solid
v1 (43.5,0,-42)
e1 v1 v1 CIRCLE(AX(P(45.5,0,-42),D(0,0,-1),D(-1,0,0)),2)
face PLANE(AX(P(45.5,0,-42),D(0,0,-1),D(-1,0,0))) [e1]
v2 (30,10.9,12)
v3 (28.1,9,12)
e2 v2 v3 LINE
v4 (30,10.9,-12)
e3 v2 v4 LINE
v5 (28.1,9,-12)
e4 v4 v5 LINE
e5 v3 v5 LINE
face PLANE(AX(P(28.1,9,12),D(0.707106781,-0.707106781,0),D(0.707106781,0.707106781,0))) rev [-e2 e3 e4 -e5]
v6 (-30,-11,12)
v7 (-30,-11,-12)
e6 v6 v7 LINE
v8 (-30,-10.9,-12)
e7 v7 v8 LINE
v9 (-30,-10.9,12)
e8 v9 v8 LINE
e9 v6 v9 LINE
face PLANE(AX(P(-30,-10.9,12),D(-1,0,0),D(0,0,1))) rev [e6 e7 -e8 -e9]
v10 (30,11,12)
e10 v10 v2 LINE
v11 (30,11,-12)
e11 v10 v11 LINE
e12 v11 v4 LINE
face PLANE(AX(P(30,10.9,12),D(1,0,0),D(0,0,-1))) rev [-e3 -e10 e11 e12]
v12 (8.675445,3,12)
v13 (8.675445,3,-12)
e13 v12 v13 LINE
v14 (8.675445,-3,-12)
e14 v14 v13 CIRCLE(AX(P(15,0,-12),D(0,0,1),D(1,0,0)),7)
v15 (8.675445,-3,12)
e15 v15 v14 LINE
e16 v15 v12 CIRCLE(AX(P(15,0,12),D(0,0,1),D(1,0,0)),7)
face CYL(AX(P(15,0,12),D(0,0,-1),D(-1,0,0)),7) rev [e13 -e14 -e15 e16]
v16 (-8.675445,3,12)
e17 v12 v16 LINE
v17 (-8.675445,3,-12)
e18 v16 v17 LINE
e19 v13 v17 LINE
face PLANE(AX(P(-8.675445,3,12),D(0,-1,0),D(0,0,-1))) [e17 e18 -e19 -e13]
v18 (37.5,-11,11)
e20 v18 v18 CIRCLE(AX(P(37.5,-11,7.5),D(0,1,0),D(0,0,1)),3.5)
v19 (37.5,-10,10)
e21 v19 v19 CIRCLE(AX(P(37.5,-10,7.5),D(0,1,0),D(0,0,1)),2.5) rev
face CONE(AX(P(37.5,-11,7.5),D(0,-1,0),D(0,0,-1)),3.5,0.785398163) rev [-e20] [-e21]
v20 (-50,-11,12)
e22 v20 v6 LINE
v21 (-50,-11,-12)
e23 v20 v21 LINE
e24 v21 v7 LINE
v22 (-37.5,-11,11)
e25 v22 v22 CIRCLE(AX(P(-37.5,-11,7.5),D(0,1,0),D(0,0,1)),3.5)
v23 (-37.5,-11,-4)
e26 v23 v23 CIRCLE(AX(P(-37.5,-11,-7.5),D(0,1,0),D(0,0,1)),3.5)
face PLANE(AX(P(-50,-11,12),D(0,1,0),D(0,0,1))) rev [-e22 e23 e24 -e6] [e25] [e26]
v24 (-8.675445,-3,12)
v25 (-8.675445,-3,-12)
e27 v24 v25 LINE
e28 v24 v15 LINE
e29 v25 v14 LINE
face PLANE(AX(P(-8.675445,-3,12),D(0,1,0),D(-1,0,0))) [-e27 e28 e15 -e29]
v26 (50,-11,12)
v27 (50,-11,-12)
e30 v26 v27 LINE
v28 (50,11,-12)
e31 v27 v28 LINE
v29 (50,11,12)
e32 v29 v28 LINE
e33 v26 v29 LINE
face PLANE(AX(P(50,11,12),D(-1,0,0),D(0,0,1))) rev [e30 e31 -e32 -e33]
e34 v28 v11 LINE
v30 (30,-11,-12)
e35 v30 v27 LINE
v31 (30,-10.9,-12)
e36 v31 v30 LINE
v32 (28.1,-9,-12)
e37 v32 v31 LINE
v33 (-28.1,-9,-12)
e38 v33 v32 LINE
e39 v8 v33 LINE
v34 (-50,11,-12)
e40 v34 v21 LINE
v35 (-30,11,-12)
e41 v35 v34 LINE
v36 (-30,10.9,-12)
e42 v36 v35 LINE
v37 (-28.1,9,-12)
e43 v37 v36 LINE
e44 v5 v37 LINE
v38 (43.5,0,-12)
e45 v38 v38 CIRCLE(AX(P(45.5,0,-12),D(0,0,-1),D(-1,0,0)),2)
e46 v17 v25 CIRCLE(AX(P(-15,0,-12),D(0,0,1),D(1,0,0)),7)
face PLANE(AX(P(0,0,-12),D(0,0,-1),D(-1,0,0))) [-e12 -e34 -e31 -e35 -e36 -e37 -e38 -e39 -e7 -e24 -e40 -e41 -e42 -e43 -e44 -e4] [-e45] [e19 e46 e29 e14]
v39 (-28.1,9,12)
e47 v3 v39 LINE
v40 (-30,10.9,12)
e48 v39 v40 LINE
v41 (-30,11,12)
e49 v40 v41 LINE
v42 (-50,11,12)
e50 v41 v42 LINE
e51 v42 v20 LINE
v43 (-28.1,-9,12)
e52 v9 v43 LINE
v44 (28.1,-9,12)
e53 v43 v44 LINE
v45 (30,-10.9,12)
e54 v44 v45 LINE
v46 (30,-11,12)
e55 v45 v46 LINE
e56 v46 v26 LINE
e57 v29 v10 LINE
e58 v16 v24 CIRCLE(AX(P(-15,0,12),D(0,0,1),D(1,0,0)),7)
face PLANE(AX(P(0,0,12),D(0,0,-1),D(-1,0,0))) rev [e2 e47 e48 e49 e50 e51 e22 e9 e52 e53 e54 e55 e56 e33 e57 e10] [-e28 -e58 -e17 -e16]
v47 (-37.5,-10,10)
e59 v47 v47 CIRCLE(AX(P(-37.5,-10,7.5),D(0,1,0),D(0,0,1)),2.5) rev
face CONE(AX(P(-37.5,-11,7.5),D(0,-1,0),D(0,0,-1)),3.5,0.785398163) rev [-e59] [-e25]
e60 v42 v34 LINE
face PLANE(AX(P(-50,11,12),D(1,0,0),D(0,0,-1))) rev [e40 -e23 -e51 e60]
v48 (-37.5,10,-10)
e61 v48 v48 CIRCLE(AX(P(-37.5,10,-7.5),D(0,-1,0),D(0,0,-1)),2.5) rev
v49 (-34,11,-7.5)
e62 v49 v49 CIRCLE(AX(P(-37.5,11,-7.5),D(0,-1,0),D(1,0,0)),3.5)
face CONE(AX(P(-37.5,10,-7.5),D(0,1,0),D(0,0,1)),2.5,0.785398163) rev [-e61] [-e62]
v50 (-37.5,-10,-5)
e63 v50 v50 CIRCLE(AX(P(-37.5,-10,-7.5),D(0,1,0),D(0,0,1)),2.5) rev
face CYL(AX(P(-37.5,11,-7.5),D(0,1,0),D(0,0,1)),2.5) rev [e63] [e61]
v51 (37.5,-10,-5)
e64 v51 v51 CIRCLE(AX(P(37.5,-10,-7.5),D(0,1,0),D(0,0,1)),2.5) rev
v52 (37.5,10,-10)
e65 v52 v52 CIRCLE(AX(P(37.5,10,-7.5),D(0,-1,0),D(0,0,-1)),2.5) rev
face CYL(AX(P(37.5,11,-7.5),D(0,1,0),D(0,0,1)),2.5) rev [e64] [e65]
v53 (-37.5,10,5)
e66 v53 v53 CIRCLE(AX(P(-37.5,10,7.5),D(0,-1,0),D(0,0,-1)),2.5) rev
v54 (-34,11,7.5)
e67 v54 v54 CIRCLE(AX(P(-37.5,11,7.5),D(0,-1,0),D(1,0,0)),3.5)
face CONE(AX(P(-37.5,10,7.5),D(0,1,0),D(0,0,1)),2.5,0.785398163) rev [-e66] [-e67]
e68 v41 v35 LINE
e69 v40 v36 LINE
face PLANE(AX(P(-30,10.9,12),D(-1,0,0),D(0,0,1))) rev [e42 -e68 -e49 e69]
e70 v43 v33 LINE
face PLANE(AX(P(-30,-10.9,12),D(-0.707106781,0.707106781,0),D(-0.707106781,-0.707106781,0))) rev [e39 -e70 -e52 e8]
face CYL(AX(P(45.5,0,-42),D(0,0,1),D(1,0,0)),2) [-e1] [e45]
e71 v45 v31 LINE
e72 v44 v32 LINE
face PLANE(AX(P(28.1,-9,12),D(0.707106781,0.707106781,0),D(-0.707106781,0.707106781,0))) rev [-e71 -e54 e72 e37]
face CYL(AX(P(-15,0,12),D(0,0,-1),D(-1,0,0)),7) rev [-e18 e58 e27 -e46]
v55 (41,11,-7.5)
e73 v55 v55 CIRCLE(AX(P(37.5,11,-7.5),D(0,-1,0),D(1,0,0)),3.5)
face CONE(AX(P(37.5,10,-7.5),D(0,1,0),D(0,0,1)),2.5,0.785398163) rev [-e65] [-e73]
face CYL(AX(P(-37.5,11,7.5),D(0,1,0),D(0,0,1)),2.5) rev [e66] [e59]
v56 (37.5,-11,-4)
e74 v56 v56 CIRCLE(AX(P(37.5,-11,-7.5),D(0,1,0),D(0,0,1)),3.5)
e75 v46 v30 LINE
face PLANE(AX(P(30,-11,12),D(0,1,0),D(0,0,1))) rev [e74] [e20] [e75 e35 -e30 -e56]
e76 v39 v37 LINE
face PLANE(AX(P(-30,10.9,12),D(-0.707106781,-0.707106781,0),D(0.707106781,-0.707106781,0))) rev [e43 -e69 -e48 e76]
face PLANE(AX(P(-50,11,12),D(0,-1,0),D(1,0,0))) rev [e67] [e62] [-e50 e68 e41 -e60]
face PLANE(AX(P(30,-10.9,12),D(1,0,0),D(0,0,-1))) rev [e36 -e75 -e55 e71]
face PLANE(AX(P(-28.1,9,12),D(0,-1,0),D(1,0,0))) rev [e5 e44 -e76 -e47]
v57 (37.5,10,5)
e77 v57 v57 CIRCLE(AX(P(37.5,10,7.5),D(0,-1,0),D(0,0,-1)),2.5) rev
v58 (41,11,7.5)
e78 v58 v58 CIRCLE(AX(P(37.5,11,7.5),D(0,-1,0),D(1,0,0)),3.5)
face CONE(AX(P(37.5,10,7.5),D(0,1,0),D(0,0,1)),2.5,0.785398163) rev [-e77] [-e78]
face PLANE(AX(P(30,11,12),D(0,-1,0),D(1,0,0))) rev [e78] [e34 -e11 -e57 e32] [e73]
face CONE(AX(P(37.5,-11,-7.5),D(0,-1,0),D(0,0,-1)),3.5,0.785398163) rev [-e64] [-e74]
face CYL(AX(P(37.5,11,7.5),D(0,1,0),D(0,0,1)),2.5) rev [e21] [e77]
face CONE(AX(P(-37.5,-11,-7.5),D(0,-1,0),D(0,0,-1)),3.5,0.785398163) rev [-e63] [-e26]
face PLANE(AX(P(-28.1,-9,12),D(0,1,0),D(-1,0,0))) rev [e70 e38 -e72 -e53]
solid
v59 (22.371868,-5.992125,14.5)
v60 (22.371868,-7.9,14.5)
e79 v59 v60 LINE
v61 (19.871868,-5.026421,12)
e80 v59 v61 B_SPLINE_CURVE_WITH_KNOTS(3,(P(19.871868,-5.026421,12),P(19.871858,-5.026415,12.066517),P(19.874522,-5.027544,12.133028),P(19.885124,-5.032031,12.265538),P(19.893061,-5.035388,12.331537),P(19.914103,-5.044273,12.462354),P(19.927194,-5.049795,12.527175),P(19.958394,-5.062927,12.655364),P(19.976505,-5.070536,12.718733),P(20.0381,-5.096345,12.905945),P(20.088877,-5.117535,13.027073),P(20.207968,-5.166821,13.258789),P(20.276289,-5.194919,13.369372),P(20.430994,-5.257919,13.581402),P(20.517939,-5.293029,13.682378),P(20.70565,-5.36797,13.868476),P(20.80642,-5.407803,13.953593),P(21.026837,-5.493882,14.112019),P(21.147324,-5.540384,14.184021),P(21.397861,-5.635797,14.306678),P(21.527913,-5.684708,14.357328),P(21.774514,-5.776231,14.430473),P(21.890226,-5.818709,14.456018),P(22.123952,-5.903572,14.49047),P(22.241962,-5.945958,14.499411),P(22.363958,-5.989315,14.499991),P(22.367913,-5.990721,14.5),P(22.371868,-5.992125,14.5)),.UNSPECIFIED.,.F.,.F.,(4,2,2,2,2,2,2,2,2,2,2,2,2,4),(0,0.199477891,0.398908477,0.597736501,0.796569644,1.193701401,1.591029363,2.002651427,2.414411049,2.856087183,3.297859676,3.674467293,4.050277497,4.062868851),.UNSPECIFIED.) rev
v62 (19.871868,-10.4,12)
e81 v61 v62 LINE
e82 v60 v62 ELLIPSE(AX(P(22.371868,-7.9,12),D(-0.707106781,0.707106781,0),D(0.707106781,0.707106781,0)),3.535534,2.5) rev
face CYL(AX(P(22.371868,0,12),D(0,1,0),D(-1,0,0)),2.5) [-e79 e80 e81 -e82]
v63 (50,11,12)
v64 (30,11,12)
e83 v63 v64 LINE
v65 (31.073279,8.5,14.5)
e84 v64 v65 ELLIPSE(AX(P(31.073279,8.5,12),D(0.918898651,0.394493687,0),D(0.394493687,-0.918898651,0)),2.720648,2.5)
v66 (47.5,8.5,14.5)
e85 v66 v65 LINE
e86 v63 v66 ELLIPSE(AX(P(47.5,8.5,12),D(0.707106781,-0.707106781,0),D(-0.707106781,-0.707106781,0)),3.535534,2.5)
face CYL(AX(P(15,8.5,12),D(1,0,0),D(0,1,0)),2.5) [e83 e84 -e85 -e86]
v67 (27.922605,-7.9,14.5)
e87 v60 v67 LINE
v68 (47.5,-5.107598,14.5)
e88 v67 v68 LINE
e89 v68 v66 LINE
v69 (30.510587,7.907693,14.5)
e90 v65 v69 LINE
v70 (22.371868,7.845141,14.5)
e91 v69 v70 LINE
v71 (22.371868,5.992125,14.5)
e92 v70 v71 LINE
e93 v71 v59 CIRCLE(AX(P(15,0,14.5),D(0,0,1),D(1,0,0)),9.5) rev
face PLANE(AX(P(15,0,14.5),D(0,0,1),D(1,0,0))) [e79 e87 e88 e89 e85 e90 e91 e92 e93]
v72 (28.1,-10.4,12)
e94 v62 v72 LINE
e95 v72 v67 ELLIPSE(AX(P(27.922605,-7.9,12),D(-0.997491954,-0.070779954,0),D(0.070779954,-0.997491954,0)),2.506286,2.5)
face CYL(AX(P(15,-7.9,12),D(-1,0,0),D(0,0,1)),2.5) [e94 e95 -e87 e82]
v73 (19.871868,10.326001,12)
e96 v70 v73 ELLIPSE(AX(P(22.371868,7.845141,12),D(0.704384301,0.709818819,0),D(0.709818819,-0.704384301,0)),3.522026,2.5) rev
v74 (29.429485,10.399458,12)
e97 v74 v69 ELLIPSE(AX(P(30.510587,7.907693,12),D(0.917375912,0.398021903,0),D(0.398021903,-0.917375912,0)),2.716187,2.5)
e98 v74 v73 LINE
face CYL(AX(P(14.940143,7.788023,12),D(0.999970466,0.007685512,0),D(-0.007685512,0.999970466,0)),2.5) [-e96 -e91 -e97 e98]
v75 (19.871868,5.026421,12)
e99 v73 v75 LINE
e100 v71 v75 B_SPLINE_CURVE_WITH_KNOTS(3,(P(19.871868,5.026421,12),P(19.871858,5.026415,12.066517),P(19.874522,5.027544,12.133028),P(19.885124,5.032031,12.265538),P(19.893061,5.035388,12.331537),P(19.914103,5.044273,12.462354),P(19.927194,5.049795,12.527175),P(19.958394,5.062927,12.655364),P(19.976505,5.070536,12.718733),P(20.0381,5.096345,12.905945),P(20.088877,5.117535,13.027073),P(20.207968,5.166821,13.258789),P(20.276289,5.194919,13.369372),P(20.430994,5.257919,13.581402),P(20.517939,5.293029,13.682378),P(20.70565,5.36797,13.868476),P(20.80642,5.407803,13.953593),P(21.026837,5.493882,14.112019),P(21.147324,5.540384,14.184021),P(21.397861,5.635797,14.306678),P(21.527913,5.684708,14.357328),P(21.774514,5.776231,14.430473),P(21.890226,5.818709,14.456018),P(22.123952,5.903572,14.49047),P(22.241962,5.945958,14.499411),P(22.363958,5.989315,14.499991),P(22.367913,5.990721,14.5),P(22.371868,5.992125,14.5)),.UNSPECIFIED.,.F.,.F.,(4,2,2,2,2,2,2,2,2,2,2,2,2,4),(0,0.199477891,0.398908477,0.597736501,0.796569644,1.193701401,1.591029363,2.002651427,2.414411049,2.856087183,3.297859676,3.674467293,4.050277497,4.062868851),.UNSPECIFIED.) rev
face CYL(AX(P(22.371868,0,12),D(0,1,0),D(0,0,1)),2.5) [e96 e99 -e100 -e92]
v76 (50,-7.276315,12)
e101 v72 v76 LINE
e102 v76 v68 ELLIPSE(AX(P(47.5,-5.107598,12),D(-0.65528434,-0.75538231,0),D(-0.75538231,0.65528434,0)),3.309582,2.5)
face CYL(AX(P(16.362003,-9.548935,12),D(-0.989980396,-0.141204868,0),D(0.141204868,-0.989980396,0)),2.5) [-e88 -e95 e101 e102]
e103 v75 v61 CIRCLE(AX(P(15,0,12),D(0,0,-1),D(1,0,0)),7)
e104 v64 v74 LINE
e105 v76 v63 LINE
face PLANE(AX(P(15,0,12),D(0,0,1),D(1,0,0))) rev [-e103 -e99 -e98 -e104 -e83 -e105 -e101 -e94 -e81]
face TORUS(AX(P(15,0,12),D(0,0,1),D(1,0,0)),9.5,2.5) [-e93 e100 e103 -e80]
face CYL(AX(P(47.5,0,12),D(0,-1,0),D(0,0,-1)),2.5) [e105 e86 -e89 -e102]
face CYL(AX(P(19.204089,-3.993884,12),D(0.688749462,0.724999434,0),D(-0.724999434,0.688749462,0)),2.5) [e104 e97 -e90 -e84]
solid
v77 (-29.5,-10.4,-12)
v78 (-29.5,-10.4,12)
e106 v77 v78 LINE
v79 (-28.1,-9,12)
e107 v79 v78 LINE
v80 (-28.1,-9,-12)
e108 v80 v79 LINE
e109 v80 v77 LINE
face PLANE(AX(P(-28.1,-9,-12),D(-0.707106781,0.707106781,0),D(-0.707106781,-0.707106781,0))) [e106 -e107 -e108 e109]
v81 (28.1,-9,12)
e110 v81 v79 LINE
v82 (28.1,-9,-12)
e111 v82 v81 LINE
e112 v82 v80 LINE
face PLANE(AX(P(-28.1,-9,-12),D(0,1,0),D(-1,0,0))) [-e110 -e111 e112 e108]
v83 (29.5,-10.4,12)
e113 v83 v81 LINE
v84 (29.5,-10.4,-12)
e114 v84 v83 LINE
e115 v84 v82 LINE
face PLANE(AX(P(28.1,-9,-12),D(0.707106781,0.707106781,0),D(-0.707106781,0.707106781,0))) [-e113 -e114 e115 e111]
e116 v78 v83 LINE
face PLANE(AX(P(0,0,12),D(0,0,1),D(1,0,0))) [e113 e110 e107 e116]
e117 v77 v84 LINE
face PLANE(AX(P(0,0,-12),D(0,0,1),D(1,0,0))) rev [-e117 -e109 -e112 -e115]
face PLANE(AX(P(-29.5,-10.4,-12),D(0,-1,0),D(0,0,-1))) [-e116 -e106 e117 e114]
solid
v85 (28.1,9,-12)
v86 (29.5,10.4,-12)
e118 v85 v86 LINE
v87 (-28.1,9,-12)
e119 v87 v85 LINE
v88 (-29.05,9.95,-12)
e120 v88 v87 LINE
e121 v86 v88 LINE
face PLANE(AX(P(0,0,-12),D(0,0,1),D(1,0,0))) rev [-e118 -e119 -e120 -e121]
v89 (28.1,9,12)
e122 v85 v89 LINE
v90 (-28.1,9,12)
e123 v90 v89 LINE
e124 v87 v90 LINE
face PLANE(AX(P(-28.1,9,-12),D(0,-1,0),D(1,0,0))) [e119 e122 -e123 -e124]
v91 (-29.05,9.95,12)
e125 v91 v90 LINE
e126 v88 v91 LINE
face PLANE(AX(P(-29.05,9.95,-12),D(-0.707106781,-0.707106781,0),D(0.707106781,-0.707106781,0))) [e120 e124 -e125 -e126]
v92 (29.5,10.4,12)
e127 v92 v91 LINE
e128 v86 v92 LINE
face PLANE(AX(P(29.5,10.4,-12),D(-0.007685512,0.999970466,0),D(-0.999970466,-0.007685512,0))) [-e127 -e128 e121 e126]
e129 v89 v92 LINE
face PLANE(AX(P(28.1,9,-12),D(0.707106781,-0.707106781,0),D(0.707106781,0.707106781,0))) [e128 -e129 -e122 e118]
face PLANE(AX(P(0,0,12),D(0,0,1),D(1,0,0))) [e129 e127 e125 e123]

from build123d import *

# Parameters (mm, degrees)
EXTRUDE_1_DEPTH    = 12
HOLE_WIZARD_M6_1_D = 5
CHAMFER_1_SIZE     = 1
EXTRUDE_2_DEPTH    = 24
EXTRUDE_2_2_DEPTH  = 24
EXTRUDE_3_DEPTH    = 2.5
FILLET_1_R         = 2.5
SKETCH_6_R         = 2
EXTRUDE_4_DEPTH    = 30


with BuildPart() as part:
    # 草图1 → 凸台-拉伸1 (new, symmetric)
    with BuildSketch(Plane.XY):
        Polygon((-30, 10.9), (-30, 11), (-50, 11), (-50, -11), (-30, -11), (-30, -10.9), (-28.1, -9), (28.1, -9), (30, -10.9), (30, -11), (50, -11), (50, 11), (30, 11), (30, 10.9), (28.1, 9), (-28.1, 9), align=None)
        with BuildLine():
            Line((-8.67544468, 3), (8.67544468, 3))
            ThreePointArc((8.67544468, 3), (22, 0), (8.67544468, -3))
            Line((8.67544468, -3), (-8.67544468, -3))
            ThreePointArc((-8.67544468, -3), (-22, 0), (-8.67544468, 3))
        make_face(mode=Mode.SUBTRACT)
    extrude(amount=EXTRUDE_1_DEPTH, both=True)

    # M6 螺纹孔1 (through all)
    with Locations(Plane(origin=(-37.5, 11, -7.5), x_dir=(1, 0, 0), z_dir=(0, 1, 0))):
        with Locations((0, 0), (0, -15), (75, 0), (75, -15)):
            Hole(HOLE_WIZARD_M6_1_D / 2)

    # 倒角1
    chamfer_1_edges = [part.edges().sort_by_distance(p)[0] for p in [
        (40, 11, 7.5),
        (40, -11, 7.5),
        (40, 11, -7.5),
        (40, -11, -7.5),
        (-35, 11, 7.5),
        (-35, -11, 7.5),
        (-35, 11, -7.5),
        (-35, -11, -7.5),
    ]]
    chamfer(chamfer_1_edges, length=CHAMFER_1_SIZE)

    # 草图6 → 凸台-拉伸4 (add)
    with BuildSketch(Plane(origin=(0, 0, -12), x_dir=(-1, 0, 0), z_dir=(0, 0, -1))):
        with Locations((-45.5, 0)):
            Circle(SKETCH_6_R)
    extrude(amount=EXTRUDE_4_DEPTH)


with BuildPart() as body_2:
    # 草图4 → 凸台-拉伸2 (new body)
    with BuildSketch(Plane.XY.offset(12)):
        Polygon((28.1, 9), (29.5, 10.4), (-29.05, 9.95), (-28.1, 9), align=None)
    extrude(amount=-EXTRUDE_2_DEPTH)


with BuildPart() as body_3:
    # 草图4 → Extrude 2 2 (new body)
    with BuildSketch(Plane.XY.offset(12)):
        Polygon((-29.5, -10.4), (29.5, -10.4), (28.1, -9), (-28.1, -9), align=None)
    extrude(amount=-EXTRUDE_2_2_DEPTH)


with BuildPart() as body_4:
    # 草图5 → 凸台-拉伸3 (new body)
    with BuildSketch(Plane.XY.offset(12)):
        with BuildLine():
            Line((19.871867852, 10.326000692), (19.871867852, 5.026420559))
            ThreePointArc((19.871867852, 5.026420559), (22, 0), (19.871867852, -5.026420559))
            Line((19.871867852, -5.026420559), (19.871867852, -10.4))
            Line((19.871867852, -10.4), (28.1, -10.4))
            Line((28.1, -10.4), (50, -7.276315303))
            Line((50, -7.276315303), (50, 11))
            Line((50, 11), (30, 11))
            Line((30, 11), (29.429485139, 10.399458041))
            Line((29.429485139, 10.399458041), (19.871867852, 10.326000692))
        make_face()
    extrude(amount=EXTRUDE_3_DEPTH)

    # 圆角1
    fillet_1_edges = [body_4.edges().sort_by_distance(p)[0] for p in [
        (29.71474257, 10.699729021, 14.5),
        (40, 11, 14.5),
        (50, 1.861842348, 14.5),
        (22, 0, 14.5),
        (23.985933926, -10.4, 14.5),
        (19.871867852, -7.713210279, 14.5),
        (19.871867852, 7.676210625, 14.5),
        (24.650676496, 10.362729367, 14.5),
        (39.05, -8.838157652, 14.5),
    ]]
    fillet(fillet_1_edges, radius=FILLET_1_R - 0.0001)  # a hair under: the kernel refuses the full size


solid = Compound([part.part, body_2.part, body_3.part, body_4.part])
